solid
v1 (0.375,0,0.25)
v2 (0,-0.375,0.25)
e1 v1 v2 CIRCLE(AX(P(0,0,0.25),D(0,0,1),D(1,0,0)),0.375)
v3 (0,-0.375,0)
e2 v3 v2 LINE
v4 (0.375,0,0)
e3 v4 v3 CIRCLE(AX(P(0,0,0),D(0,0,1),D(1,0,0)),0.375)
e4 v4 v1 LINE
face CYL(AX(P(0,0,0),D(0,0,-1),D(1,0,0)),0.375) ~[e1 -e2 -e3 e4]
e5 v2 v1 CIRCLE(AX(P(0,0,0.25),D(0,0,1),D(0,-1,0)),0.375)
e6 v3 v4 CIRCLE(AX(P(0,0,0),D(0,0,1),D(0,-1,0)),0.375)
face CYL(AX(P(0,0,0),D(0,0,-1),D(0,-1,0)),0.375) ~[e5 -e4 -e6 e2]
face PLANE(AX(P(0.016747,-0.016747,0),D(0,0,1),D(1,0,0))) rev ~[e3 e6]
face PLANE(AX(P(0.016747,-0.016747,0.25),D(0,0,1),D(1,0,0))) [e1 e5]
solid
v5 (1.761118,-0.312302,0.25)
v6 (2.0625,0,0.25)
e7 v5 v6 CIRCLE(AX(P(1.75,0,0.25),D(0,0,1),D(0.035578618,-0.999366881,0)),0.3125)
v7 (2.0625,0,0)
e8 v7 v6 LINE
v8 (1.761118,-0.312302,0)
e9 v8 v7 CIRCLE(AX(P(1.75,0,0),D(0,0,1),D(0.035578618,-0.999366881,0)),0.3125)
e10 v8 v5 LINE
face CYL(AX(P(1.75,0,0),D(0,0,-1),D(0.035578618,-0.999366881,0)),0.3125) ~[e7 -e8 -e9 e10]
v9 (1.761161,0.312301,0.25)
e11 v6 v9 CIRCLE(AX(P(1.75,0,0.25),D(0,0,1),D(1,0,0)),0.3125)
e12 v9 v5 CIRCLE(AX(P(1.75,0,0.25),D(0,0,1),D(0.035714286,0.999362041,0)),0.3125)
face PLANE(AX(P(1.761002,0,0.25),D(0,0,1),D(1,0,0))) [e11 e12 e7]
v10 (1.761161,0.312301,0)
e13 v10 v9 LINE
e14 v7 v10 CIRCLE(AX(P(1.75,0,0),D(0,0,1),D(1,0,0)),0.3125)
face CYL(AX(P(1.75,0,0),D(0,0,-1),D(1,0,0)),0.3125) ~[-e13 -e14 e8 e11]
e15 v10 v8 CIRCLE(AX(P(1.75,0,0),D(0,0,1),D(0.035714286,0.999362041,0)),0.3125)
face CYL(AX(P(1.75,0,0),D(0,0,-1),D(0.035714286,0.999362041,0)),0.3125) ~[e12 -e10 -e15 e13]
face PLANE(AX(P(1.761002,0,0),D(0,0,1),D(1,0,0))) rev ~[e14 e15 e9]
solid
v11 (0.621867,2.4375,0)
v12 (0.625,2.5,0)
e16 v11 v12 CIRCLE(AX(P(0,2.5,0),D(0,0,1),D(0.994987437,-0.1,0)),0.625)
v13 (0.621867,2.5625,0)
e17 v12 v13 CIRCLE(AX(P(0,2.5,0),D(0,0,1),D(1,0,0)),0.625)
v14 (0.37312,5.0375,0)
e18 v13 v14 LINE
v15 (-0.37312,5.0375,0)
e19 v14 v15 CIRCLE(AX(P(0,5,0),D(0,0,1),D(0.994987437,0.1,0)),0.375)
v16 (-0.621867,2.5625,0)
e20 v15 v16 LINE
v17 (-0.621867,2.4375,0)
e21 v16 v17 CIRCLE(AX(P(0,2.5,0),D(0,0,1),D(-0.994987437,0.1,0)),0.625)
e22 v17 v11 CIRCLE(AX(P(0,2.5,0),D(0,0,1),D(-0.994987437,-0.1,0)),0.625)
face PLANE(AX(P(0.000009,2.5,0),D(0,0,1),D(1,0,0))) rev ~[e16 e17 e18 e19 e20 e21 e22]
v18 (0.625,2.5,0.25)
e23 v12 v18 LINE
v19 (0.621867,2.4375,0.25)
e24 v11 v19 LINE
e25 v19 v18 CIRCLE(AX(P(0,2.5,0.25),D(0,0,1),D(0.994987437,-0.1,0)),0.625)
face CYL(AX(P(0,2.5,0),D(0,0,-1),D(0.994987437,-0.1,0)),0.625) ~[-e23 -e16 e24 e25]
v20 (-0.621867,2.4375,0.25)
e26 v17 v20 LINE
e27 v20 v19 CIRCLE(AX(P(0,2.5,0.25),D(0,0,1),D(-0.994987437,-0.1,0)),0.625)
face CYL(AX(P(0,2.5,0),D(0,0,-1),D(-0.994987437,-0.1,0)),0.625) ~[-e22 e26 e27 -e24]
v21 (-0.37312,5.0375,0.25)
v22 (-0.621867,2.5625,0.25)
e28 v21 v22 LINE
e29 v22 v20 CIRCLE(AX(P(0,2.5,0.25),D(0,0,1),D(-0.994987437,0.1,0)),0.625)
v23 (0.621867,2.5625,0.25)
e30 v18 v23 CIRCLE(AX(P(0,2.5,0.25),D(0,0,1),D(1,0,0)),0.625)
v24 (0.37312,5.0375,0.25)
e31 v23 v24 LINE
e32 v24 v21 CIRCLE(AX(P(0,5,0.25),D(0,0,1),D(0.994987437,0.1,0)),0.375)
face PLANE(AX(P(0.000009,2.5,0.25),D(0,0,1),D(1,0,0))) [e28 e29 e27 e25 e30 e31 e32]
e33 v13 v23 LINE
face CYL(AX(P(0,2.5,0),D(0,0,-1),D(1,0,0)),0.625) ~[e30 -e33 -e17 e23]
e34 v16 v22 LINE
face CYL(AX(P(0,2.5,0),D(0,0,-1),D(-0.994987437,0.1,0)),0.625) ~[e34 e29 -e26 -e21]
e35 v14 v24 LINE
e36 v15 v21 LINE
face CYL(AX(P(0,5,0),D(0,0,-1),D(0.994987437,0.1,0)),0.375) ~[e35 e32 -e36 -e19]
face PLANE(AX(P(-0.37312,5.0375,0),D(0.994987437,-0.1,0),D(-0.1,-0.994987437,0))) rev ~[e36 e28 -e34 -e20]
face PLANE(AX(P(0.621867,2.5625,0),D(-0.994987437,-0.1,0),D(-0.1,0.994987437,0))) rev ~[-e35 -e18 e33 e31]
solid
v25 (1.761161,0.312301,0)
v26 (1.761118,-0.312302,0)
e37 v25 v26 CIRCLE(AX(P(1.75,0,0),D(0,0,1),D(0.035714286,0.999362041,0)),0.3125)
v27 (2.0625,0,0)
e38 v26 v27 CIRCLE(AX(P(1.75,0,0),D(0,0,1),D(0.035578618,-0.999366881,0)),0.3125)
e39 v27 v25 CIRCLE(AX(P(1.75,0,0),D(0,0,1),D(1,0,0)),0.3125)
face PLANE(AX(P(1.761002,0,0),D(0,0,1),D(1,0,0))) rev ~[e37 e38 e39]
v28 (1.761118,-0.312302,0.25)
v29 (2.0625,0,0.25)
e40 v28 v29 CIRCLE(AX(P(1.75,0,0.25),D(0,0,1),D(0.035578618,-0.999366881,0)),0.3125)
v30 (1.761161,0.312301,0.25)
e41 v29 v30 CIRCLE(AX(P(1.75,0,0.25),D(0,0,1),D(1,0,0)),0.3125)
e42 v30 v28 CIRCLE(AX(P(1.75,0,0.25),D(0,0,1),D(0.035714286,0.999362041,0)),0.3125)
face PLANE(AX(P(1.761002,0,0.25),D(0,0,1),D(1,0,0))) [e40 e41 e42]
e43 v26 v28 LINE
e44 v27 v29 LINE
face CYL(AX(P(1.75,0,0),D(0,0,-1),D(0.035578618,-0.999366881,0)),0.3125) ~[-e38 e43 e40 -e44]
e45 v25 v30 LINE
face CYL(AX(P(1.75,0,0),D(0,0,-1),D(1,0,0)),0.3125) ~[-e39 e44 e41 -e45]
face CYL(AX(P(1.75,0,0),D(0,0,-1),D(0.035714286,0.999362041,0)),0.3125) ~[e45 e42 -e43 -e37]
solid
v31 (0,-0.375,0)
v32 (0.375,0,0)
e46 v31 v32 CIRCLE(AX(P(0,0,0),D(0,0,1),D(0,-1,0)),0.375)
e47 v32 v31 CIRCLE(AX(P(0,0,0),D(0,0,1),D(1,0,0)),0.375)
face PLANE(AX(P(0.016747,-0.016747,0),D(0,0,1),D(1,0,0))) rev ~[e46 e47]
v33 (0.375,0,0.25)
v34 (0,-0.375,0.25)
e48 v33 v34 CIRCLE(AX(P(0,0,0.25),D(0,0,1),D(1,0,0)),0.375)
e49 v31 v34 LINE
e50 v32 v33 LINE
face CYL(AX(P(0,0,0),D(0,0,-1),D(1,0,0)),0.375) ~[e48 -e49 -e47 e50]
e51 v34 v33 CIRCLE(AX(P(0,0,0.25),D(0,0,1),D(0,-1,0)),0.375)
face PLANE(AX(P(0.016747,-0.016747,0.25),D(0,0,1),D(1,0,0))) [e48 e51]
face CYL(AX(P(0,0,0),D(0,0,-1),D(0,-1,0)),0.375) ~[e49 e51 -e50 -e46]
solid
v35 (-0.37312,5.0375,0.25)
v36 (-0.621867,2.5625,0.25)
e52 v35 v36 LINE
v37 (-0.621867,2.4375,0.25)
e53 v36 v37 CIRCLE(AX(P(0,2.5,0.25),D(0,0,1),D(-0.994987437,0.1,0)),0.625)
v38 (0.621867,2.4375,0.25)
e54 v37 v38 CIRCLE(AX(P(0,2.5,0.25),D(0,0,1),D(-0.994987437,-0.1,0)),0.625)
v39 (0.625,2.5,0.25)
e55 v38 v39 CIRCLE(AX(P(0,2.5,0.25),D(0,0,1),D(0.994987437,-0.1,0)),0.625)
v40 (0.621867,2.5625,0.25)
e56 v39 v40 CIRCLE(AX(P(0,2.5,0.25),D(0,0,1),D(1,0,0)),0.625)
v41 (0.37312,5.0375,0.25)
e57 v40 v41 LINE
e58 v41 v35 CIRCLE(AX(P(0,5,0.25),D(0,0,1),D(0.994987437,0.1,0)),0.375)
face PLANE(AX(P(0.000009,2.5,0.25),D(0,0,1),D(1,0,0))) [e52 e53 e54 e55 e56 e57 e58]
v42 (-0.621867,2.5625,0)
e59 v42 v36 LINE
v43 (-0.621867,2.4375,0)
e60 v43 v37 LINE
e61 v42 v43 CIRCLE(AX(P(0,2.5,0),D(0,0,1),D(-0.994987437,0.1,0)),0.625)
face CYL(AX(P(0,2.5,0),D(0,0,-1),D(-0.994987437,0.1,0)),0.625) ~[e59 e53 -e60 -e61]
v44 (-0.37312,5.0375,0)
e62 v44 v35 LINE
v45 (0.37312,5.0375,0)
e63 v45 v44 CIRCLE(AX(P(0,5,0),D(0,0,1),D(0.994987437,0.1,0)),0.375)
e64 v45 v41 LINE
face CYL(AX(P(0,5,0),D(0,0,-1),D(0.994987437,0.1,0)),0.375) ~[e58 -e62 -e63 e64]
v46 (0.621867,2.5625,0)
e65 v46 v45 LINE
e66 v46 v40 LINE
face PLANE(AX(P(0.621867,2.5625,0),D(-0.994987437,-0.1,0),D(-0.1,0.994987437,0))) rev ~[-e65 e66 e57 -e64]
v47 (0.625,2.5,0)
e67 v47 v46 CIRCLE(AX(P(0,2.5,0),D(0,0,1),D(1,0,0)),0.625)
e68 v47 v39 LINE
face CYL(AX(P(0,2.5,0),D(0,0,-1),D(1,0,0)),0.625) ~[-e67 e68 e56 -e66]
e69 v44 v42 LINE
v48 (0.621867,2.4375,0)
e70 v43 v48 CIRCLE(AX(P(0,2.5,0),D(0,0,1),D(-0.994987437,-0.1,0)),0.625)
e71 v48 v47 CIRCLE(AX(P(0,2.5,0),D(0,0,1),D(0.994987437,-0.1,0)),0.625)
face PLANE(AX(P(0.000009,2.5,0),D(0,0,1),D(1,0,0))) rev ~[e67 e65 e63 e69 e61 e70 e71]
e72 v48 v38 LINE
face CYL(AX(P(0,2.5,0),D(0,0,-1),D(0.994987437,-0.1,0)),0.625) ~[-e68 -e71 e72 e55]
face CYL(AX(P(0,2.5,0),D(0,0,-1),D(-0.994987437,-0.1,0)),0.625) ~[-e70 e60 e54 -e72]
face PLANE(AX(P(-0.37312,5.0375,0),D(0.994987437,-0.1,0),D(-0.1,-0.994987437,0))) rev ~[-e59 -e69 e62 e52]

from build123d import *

# Parameters (mm, degrees)
F1_DEPTH = 0.25
F2_DEPTH = 0.25


with BuildPart() as f1:
    # F0 (on Top) → F1 (new body)
    with BuildSketch(Plane.XY):
        with BuildLine():
            ThreePointArc((-0.6218671482, 2.4375), (0, 1.875), (0.6218671482, 2.4375))
            ThreePointArc((0.6218671482, 2.4375), (0.6242162957, 2.4687107656), (0.625, 2.5))
            ThreePointArc((0.625, 2.5), (0.6242162957, 2.5312892344), (0.6218671482, 2.5625))
            ThreePointArc((0.6218671482, 2.5625), (0, 3.125), (-0.6218671482, 2.5625))
            ThreePointArc((-0.6218671482, 2.5625), (-0.625, 2.5), (-0.6218671482, 2.4375))
        make_face()
        with BuildLine():
            Line((-0.3731202889, 5.0375), (-0.6218671482, 2.5625))
            ThreePointArc((-0.6218671482, 2.5625), (0, 3.125), (0.6218671482, 2.5625))
            Line((0.6218671482, 2.5625), (0.3731202889, 5.0375))
            ThreePointArc((0.3731202889, 5.0375), (0.3745297774, 5.0187735406), (0.375, 5))
            ThreePointArc((0.375, 5), (-0.0187735406, 4.6254702226), (-0.3731202889, 5.0375))
        make_face()
        with BuildLine():
            ThreePointArc((0.3731202889, 5.0375), (0, 5.375), (-0.3731202889, 5.0375))
            ThreePointArc((-0.3731202889, 5.0375), (-0.0187735406, 4.6254702226), (0.375, 5))
            ThreePointArc((0.375, 5), (0.3745297774, 5.0187735406), (0.3731202889, 5.0375))
        make_face()
    extrude(amount=F1_DEPTH)


with BuildPart() as f1b:
    # F0 (on Top) → F1, piece 2 (new body)
    with BuildSketch(Plane.XY):
        with BuildLine():
            ThreePointArc((1.7611607143, 0.3123006379), (1.4375000007, 2.12117e-05), (1.7611183179, -0.3123021502))
            ThreePointArc((1.7611183179, -0.3123021502), (1.9748674324, -0.2170043498), (2.0625, 0))
            ThreePointArc((2.0625, 0), (1.9748821616, 0.2169890859), (1.7611607143, 0.3123006379))
        make_face()
    extrude(amount=F1_DEPTH)


with BuildPart() as f1c:
    # F0 (on Top) → F1, piece 3 (new body)
    with BuildSketch(Plane.XY):
        with BuildLine():
            ThreePointArc((0, -0.375), (0.2651650429, -0.2651650429), (0.375, 0))
            ThreePointArc((0.375, 0), (-0.2651650429, 0.2651650429), (0, -0.375))
        make_face()
    extrude(amount=F1_DEPTH)


with BuildPart() as f2:
    # F0 (on Top) → F2 (new body)
    with BuildSketch(Plane.XY):
        with BuildLine():
            ThreePointArc((-0.6218671482, 2.4375), (0, 1.875), (0.6218671482, 2.4375))
            ThreePointArc((0.6218671482, 2.4375), (0.6242162957, 2.4687107656), (0.625, 2.5))
            ThreePointArc((0.625, 2.5), (0.6242162957, 2.5312892344), (0.6218671482, 2.5625))
            ThreePointArc((0.6218671482, 2.5625), (0, 3.125), (-0.6218671482, 2.5625))
            ThreePointArc((-0.6218671482, 2.5625), (-0.625, 2.5), (-0.6218671482, 2.4375))
        make_face()
        with BuildLine():
            Line((-0.3731202889, 5.0375), (-0.6218671482, 2.5625))
            ThreePointArc((-0.6218671482, 2.5625), (0, 3.125), (0.6218671482, 2.5625))
            Line((0.6218671482, 2.5625), (0.3731202889, 5.0375))
            ThreePointArc((0.3731202889, 5.0375), (0.3745297774, 5.0187735406), (0.375, 5))
            ThreePointArc((0.375, 5), (-0.0187735406, 4.6254702226), (-0.3731202889, 5.0375))
        make_face()
        with BuildLine():
            ThreePointArc((0.3731202889, 5.0375), (0, 5.375), (-0.3731202889, 5.0375))
            ThreePointArc((-0.3731202889, 5.0375), (-0.0187735406, 4.6254702226), (0.375, 5))
            ThreePointArc((0.375, 5), (0.3745297774, 5.0187735406), (0.3731202889, 5.0375))
        make_face()
    extrude(amount=F2_DEPTH)


with BuildPart() as f2b:
    # F0 (on Top) → F2, piece 2 (new body)
    with BuildSketch(Plane.XY):
        with BuildLine():
            ThreePointArc((1.7611607143, 0.3123006379), (1.4375000007, 2.12117e-05), (1.7611183179, -0.3123021502))
            ThreePointArc((1.7611183179, -0.3123021502), (1.9748674324, -0.2170043498), (2.0625, 0))
            ThreePointArc((2.0625, 0), (1.9748821616, 0.2169890859), (1.7611607143, 0.3123006379))
        make_face()
    extrude(amount=F2_DEPTH)


with BuildPart() as f2c:
    # F0 (on Top) → F2, piece 3 (new body)
    with BuildSketch(Plane.XY):
        with BuildLine():
            ThreePointArc((0, -0.375), (0.2651650429, -0.2651650429), (0.375, 0))
            ThreePointArc((0.375, 0), (-0.2651650429, 0.2651650429), (0, -0.375))
        make_face()
    extrude(amount=F2_DEPTH)


solid = Compound([f1.part, f1b.part, f1c.part, f2.part, f2b.part, f2c.part])
